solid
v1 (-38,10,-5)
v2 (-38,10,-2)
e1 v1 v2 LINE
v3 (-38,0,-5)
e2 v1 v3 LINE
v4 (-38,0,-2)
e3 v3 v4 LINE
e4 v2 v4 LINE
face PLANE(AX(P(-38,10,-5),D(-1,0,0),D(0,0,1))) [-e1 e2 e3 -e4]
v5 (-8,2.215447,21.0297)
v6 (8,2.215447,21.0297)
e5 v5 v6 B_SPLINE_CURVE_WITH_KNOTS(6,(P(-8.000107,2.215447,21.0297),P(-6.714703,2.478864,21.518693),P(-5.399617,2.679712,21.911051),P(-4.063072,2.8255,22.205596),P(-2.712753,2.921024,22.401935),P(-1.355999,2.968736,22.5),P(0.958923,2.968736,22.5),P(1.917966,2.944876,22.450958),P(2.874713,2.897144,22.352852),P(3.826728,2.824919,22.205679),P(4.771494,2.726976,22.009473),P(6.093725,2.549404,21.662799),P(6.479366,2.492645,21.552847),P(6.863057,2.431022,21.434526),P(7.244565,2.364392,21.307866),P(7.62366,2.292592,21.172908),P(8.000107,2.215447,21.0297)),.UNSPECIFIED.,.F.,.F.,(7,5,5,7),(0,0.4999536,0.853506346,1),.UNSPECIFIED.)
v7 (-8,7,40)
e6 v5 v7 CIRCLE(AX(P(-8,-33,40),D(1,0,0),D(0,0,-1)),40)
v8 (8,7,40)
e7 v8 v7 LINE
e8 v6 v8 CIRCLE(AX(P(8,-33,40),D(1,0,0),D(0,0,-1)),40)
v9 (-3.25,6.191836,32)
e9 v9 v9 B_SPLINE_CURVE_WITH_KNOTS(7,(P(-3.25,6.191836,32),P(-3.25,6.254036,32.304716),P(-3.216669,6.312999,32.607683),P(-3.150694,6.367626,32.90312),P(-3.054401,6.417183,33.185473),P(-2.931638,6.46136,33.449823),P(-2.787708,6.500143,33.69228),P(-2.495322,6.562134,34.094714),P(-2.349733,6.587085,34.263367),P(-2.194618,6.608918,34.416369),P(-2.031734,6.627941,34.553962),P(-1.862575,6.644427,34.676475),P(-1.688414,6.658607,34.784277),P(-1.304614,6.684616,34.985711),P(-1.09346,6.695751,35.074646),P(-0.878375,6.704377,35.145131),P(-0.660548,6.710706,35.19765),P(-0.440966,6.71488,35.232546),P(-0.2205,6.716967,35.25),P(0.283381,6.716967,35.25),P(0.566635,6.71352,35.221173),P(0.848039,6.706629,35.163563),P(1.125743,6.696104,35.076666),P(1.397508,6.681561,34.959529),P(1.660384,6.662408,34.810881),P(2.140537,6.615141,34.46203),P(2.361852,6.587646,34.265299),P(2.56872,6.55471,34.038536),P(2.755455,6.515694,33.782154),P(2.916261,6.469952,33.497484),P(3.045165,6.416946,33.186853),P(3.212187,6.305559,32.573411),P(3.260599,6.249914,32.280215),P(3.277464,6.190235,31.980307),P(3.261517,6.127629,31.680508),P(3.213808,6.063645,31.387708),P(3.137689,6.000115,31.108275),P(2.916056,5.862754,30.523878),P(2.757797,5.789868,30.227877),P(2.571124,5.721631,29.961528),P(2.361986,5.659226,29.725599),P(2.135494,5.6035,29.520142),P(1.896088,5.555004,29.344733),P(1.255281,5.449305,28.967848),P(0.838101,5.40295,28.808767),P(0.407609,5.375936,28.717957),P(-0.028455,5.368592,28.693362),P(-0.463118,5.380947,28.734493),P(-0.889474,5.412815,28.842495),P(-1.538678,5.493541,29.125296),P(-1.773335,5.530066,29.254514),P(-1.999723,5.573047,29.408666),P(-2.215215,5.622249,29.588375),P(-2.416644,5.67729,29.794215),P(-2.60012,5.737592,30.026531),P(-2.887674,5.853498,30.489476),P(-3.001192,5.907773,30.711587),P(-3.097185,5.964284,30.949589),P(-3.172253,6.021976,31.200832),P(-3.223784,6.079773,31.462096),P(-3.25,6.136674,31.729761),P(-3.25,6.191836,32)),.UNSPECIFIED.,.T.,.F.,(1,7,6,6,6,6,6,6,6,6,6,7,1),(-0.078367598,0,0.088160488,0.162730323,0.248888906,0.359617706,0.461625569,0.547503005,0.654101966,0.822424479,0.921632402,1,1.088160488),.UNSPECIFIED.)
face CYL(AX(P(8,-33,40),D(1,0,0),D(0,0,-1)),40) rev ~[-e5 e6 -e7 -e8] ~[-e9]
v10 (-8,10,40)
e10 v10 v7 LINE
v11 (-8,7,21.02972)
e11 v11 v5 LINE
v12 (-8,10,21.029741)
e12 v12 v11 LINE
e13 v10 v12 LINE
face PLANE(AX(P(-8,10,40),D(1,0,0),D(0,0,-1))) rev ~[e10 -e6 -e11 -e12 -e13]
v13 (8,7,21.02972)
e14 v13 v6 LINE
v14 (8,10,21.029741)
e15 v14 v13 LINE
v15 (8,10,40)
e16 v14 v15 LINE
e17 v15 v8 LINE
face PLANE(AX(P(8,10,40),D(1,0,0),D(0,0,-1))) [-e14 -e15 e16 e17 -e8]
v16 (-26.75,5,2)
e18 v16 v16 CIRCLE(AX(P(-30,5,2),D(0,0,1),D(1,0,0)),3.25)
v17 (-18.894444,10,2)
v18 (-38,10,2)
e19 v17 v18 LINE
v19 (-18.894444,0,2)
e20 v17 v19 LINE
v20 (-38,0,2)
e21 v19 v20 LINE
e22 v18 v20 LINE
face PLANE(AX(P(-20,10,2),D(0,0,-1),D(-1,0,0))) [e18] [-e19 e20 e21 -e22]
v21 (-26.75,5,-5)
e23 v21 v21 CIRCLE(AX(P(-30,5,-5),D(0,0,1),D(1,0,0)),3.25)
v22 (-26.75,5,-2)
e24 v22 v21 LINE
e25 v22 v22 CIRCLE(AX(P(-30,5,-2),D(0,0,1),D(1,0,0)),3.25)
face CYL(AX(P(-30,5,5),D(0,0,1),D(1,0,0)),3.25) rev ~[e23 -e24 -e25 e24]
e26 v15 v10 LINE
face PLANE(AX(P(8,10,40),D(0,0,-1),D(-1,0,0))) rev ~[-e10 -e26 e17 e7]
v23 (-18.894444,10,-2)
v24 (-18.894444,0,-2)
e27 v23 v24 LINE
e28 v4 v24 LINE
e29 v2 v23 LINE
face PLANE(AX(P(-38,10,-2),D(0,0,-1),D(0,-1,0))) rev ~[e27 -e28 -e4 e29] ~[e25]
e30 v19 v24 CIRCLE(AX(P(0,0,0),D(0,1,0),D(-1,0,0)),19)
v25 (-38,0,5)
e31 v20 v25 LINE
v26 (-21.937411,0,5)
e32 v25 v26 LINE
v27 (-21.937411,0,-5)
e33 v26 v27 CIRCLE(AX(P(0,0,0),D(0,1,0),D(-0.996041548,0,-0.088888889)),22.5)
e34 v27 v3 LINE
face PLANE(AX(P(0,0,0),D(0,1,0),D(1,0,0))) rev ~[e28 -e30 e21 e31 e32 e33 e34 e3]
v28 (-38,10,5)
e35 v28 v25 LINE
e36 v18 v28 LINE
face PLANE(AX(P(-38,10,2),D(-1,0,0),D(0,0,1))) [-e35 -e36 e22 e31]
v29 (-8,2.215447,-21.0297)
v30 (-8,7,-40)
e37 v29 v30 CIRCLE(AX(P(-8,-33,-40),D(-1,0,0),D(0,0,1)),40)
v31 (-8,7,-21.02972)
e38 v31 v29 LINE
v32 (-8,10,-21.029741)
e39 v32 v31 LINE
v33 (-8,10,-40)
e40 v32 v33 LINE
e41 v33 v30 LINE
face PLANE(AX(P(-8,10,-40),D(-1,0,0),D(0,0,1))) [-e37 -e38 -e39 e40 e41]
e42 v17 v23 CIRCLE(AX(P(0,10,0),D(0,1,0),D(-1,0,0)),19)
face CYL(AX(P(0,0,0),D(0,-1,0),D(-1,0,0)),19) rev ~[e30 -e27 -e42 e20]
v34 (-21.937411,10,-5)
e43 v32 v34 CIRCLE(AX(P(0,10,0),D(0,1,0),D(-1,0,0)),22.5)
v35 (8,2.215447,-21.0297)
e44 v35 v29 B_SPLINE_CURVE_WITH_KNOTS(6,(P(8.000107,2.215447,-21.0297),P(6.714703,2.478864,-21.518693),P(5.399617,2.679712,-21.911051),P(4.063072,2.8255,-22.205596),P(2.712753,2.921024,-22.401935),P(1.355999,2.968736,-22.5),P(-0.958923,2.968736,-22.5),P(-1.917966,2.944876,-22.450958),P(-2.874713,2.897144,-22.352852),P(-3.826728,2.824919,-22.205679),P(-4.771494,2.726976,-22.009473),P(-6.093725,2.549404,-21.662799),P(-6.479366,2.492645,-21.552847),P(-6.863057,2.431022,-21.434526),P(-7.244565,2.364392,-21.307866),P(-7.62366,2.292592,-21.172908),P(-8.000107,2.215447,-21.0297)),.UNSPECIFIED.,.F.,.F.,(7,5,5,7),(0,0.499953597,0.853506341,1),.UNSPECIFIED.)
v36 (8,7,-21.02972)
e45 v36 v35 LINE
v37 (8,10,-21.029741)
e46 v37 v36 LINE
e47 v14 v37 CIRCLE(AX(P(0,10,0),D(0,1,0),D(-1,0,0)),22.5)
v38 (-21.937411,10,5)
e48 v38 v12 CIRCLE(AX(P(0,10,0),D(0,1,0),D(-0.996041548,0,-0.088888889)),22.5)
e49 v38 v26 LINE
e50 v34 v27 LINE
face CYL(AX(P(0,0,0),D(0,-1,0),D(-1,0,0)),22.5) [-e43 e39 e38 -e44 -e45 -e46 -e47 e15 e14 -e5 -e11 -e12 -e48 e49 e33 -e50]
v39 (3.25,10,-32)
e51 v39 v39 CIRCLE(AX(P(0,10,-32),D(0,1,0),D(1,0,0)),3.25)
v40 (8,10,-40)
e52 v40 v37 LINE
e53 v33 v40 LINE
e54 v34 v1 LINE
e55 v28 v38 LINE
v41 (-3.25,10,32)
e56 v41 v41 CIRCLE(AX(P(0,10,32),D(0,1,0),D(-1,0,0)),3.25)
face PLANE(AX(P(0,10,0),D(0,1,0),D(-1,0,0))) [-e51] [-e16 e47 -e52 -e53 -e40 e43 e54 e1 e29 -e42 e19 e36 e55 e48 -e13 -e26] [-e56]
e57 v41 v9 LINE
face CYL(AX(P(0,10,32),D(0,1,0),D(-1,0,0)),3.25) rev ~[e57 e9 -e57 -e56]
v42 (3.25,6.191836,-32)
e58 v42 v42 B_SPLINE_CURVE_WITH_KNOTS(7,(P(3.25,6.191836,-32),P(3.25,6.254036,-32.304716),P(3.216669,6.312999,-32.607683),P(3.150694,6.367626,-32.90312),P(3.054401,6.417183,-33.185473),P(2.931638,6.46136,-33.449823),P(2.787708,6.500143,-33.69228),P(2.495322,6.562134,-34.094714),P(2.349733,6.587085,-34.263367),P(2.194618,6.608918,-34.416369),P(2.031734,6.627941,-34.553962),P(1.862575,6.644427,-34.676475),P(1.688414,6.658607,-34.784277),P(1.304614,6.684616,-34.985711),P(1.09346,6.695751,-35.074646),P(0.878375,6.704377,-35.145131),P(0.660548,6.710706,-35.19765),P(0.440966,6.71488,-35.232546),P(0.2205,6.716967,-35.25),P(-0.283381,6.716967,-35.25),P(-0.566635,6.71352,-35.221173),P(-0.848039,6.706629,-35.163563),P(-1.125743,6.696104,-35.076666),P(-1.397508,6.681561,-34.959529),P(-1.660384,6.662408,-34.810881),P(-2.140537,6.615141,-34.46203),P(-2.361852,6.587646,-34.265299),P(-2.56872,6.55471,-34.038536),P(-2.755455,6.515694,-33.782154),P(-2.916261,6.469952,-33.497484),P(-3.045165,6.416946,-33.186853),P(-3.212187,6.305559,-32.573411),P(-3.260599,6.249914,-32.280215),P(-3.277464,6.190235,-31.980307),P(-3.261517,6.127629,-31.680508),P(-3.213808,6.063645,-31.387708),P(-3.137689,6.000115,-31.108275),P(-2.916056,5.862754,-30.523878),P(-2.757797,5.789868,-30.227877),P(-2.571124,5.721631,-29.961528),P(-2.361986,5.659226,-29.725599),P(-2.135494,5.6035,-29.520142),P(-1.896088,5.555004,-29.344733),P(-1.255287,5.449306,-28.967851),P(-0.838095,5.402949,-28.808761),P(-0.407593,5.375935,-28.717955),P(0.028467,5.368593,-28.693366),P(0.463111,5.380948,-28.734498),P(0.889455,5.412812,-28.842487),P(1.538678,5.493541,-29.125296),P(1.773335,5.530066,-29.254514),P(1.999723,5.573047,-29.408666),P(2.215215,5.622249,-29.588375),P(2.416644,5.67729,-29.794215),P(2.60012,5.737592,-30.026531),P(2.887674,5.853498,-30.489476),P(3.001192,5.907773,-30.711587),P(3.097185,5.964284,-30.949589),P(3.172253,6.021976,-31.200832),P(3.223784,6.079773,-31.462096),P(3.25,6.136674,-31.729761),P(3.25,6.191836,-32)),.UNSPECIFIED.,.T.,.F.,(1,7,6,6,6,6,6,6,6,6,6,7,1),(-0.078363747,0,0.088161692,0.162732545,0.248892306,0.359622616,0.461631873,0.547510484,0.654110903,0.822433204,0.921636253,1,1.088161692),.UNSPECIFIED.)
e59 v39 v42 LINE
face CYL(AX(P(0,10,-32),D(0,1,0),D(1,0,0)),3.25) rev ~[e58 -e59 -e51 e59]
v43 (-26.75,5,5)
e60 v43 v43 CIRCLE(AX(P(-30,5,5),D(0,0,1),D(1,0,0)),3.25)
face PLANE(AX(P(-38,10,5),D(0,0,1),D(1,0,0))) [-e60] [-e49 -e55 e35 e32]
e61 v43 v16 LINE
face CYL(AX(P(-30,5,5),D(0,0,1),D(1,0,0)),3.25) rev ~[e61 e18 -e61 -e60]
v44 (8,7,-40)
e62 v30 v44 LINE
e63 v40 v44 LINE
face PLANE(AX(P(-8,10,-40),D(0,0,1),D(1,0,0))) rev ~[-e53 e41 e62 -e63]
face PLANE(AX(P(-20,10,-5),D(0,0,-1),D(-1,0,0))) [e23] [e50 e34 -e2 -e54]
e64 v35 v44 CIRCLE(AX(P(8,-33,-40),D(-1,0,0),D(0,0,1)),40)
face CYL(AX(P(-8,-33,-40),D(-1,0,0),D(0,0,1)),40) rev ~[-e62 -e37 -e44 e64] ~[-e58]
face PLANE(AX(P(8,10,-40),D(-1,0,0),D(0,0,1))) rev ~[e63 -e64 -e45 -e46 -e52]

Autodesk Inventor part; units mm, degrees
ref_plane "YZ Plane" through (0, 0, 0) normal (1, 0, 0) x (0, 1, 0)
ref_plane "XZ Plane" through (0, 0, 0) normal (0, 1, 0) x (-1, 0, 0)
ref_plane "XY Plane" through (0, 0, 0) normal (0, 0, 1) x (1, 0, 0)
sketch "Sketch1" plane through (0, 0, 0) normal (0, 1, 0) x (-1, 0, 0)
  circle A0 centre (0, 0) radius 22.5
  circle A1 centre (0, 0) radius 19
  dimension "d0" = 45
  dimension "d1" = 38
extrude "Extrusion1" add sketch "Sketch1" along normal blind 10
sketch "Sketch2" plane through (0, 10, 0) normal (0, 1, 0) x (1, 0, 0)
  circle A0 centre (0, 0) radius 22.5 projected
  line L0 (0, -22.5) -> (0, 22.5) construction
  circle A1 centre (0, 0) radius 19 projected
  line L1 (-19, 0) -> (19, 0) construction
sketch "Sketch3" plane through (0, 10, 0) normal (0, 1, 0) x (1, 0, 0)
  line L0 (-8, -20) -> (8, -20)
  line L1 (8, -20) -> (8, -40)
  line L2 (8, -40) -> (-8, -40)
  line L3 (-8, -40) -> (-8, -20)
  point P0 (0, 0)
  dimension "d4" = 16
  dimension "d5" = 20
  dimension "d6" = 20
  dimension "d7" = 8
extrude "Extrusion2" add sketch "Sketch3" against normal blind 3
pattern_circular "Circular Pattern1" count 2 over 360 about axis through (0, 0, 0) along (0, 1, 0) of "Extrusion2"
sketch "Sketch4" plane through (0, 10, 0) normal (0, 1, 0) x (1, 0, 0)
  point P0 (0, 0)
sketch "Sketch6" plane through (0, 10, 0) normal (0, 1, 0) x (1, 0, 0)
  line L0 (-20, 5) -> (-38, 5)
  line L1 (-38, 5) -> (-38, 2)
  line L2 (-38, 2) -> (-20, 2)
  line L3 (-20, 2) -> (-20, 5)
  point P0 (0, 0)
  dimension "d14" = 18
  dimension "d15" = 3
  dimension "d16" = 20
  dimension "d17" = 2
extrude "Extrusion3" add sketch "Sketch6" against normal blind 10
pattern_linear "Rectangular Pattern1" count 2 spacing 7 along (0, 0, 1) of "Extrusion3"
sketch "Sketch7" plane through (-38, 10, 2) normal (-1, 0, 0) x (0, 0, 1)
  line L0 (0, 0) -> (0, -10) projected
  line L1 (-4, 0) -> (-4, -10) projected
  line L2 (0, -10) -> (-4, -10)
  line L3 (-4, -10) -> (-4, 0)
  line L4 (-4, 0) -> (0, 0)
  line L5 (0, 0) -> (0, -10)
  point P0 (-2, -10)
extrude "Extrusion4" cut sketch "Sketch7" against normal blind 20
sketch "Sketch9" plane through (0, 7, 0) normal (0, -1, 0) x (1, 0, 0)
  point P0 (0, 0)
sketch "Sketch10" plane through (0, 7, 0) normal (0, -1, 0) x (1, 0, 0)
  point P0 (0, 0)
sketch "Sketch11" plane through (8, 10, -40) normal (0, 0, -1) x (-1, 0, 0)
  point P0 (8, -10)
sketch "Sketch13" plane through (-8, 10, -40) normal (-1, 0, 0) x (0, 0, 1)
  point P0 (40, -10)
sketch "Sketch14" plane through (-38, 10, 5) normal (0, 0, 1) x (1, 0, 0)
  circle A0 centre (8, -5) radius 3.25
  line L0 (0, 0) -> (0, -10) projected
  line L1 (16.0626, -10) -> (0, -10) projected
  point P0 (38, -10)
  dimension "d27" = 6.5
  dimension "d28" = 8
  dimension "d29" = 5
extrude "Extrusion5" cut sketch "Sketch14" against normal blind 20
sketch "Sketch17" plane through (0, 0, 0) normal (0, -1, 0) x (1, 0, 0)
  arc A0 (-21.9374, -5) -> (-8, -21.0297) centre (0, 0) ccw projected
  line L0 (-8, -21.0297) -> (-8, -17.2337) construction
  arc A1 (-18.8944, -2) -> (-18.8944, 2) centre (0, 0) ccw projected
sketch "Sketch21" plane through (-8, 10, -40) normal (-1, 0, 0) x (0, 0, 1)
  line L0 (0, -43) -> (18, -10) construction
  line L1 (62.5, -10) -> (17.5, -10) projected
  line L2 (18.9703, -3) -> (0, -3) projected
  line L3 (0, 0) -> (0, -3) projected
  circle A0 centre (0, -43) radius 40
  line L4 (18.9703, -3) -> (18.9703, -10)
  point P0 (40, -10)
  point P1 (45, -10)
  point P2 (35, -10)
  point P3 (18.9703, -7.7845)
  dimension "d33" = 40
  dimension "d34" = 0
  dimension "d35" = 18
extrude "Extrusion6" add sketch "Sketch21" against normal blind 16 contours A0 L2 L4
sketch "Sketch22" plane through (0, 10, 0) normal (0, 1, 0) x (1, 0, 0)
  circle A0 centre (0, 32) radius 3.25
  line L0 (8, 40) -> (-8, 40) projected
  point P0 (0, 0)
  dimension "d38" = 6.5
  dimension "d39" = 8
extrude "Extrusion7" cut sketch "Sketch22" against normal blind 16
pattern_circular "Circular Pattern2" count 2 over 360 about axis through (0, 0, 0) along (0, 1, 0) of "Extrusion7", "Extrusion6"
properties part number "motor holder" material "ABS Plastic"
